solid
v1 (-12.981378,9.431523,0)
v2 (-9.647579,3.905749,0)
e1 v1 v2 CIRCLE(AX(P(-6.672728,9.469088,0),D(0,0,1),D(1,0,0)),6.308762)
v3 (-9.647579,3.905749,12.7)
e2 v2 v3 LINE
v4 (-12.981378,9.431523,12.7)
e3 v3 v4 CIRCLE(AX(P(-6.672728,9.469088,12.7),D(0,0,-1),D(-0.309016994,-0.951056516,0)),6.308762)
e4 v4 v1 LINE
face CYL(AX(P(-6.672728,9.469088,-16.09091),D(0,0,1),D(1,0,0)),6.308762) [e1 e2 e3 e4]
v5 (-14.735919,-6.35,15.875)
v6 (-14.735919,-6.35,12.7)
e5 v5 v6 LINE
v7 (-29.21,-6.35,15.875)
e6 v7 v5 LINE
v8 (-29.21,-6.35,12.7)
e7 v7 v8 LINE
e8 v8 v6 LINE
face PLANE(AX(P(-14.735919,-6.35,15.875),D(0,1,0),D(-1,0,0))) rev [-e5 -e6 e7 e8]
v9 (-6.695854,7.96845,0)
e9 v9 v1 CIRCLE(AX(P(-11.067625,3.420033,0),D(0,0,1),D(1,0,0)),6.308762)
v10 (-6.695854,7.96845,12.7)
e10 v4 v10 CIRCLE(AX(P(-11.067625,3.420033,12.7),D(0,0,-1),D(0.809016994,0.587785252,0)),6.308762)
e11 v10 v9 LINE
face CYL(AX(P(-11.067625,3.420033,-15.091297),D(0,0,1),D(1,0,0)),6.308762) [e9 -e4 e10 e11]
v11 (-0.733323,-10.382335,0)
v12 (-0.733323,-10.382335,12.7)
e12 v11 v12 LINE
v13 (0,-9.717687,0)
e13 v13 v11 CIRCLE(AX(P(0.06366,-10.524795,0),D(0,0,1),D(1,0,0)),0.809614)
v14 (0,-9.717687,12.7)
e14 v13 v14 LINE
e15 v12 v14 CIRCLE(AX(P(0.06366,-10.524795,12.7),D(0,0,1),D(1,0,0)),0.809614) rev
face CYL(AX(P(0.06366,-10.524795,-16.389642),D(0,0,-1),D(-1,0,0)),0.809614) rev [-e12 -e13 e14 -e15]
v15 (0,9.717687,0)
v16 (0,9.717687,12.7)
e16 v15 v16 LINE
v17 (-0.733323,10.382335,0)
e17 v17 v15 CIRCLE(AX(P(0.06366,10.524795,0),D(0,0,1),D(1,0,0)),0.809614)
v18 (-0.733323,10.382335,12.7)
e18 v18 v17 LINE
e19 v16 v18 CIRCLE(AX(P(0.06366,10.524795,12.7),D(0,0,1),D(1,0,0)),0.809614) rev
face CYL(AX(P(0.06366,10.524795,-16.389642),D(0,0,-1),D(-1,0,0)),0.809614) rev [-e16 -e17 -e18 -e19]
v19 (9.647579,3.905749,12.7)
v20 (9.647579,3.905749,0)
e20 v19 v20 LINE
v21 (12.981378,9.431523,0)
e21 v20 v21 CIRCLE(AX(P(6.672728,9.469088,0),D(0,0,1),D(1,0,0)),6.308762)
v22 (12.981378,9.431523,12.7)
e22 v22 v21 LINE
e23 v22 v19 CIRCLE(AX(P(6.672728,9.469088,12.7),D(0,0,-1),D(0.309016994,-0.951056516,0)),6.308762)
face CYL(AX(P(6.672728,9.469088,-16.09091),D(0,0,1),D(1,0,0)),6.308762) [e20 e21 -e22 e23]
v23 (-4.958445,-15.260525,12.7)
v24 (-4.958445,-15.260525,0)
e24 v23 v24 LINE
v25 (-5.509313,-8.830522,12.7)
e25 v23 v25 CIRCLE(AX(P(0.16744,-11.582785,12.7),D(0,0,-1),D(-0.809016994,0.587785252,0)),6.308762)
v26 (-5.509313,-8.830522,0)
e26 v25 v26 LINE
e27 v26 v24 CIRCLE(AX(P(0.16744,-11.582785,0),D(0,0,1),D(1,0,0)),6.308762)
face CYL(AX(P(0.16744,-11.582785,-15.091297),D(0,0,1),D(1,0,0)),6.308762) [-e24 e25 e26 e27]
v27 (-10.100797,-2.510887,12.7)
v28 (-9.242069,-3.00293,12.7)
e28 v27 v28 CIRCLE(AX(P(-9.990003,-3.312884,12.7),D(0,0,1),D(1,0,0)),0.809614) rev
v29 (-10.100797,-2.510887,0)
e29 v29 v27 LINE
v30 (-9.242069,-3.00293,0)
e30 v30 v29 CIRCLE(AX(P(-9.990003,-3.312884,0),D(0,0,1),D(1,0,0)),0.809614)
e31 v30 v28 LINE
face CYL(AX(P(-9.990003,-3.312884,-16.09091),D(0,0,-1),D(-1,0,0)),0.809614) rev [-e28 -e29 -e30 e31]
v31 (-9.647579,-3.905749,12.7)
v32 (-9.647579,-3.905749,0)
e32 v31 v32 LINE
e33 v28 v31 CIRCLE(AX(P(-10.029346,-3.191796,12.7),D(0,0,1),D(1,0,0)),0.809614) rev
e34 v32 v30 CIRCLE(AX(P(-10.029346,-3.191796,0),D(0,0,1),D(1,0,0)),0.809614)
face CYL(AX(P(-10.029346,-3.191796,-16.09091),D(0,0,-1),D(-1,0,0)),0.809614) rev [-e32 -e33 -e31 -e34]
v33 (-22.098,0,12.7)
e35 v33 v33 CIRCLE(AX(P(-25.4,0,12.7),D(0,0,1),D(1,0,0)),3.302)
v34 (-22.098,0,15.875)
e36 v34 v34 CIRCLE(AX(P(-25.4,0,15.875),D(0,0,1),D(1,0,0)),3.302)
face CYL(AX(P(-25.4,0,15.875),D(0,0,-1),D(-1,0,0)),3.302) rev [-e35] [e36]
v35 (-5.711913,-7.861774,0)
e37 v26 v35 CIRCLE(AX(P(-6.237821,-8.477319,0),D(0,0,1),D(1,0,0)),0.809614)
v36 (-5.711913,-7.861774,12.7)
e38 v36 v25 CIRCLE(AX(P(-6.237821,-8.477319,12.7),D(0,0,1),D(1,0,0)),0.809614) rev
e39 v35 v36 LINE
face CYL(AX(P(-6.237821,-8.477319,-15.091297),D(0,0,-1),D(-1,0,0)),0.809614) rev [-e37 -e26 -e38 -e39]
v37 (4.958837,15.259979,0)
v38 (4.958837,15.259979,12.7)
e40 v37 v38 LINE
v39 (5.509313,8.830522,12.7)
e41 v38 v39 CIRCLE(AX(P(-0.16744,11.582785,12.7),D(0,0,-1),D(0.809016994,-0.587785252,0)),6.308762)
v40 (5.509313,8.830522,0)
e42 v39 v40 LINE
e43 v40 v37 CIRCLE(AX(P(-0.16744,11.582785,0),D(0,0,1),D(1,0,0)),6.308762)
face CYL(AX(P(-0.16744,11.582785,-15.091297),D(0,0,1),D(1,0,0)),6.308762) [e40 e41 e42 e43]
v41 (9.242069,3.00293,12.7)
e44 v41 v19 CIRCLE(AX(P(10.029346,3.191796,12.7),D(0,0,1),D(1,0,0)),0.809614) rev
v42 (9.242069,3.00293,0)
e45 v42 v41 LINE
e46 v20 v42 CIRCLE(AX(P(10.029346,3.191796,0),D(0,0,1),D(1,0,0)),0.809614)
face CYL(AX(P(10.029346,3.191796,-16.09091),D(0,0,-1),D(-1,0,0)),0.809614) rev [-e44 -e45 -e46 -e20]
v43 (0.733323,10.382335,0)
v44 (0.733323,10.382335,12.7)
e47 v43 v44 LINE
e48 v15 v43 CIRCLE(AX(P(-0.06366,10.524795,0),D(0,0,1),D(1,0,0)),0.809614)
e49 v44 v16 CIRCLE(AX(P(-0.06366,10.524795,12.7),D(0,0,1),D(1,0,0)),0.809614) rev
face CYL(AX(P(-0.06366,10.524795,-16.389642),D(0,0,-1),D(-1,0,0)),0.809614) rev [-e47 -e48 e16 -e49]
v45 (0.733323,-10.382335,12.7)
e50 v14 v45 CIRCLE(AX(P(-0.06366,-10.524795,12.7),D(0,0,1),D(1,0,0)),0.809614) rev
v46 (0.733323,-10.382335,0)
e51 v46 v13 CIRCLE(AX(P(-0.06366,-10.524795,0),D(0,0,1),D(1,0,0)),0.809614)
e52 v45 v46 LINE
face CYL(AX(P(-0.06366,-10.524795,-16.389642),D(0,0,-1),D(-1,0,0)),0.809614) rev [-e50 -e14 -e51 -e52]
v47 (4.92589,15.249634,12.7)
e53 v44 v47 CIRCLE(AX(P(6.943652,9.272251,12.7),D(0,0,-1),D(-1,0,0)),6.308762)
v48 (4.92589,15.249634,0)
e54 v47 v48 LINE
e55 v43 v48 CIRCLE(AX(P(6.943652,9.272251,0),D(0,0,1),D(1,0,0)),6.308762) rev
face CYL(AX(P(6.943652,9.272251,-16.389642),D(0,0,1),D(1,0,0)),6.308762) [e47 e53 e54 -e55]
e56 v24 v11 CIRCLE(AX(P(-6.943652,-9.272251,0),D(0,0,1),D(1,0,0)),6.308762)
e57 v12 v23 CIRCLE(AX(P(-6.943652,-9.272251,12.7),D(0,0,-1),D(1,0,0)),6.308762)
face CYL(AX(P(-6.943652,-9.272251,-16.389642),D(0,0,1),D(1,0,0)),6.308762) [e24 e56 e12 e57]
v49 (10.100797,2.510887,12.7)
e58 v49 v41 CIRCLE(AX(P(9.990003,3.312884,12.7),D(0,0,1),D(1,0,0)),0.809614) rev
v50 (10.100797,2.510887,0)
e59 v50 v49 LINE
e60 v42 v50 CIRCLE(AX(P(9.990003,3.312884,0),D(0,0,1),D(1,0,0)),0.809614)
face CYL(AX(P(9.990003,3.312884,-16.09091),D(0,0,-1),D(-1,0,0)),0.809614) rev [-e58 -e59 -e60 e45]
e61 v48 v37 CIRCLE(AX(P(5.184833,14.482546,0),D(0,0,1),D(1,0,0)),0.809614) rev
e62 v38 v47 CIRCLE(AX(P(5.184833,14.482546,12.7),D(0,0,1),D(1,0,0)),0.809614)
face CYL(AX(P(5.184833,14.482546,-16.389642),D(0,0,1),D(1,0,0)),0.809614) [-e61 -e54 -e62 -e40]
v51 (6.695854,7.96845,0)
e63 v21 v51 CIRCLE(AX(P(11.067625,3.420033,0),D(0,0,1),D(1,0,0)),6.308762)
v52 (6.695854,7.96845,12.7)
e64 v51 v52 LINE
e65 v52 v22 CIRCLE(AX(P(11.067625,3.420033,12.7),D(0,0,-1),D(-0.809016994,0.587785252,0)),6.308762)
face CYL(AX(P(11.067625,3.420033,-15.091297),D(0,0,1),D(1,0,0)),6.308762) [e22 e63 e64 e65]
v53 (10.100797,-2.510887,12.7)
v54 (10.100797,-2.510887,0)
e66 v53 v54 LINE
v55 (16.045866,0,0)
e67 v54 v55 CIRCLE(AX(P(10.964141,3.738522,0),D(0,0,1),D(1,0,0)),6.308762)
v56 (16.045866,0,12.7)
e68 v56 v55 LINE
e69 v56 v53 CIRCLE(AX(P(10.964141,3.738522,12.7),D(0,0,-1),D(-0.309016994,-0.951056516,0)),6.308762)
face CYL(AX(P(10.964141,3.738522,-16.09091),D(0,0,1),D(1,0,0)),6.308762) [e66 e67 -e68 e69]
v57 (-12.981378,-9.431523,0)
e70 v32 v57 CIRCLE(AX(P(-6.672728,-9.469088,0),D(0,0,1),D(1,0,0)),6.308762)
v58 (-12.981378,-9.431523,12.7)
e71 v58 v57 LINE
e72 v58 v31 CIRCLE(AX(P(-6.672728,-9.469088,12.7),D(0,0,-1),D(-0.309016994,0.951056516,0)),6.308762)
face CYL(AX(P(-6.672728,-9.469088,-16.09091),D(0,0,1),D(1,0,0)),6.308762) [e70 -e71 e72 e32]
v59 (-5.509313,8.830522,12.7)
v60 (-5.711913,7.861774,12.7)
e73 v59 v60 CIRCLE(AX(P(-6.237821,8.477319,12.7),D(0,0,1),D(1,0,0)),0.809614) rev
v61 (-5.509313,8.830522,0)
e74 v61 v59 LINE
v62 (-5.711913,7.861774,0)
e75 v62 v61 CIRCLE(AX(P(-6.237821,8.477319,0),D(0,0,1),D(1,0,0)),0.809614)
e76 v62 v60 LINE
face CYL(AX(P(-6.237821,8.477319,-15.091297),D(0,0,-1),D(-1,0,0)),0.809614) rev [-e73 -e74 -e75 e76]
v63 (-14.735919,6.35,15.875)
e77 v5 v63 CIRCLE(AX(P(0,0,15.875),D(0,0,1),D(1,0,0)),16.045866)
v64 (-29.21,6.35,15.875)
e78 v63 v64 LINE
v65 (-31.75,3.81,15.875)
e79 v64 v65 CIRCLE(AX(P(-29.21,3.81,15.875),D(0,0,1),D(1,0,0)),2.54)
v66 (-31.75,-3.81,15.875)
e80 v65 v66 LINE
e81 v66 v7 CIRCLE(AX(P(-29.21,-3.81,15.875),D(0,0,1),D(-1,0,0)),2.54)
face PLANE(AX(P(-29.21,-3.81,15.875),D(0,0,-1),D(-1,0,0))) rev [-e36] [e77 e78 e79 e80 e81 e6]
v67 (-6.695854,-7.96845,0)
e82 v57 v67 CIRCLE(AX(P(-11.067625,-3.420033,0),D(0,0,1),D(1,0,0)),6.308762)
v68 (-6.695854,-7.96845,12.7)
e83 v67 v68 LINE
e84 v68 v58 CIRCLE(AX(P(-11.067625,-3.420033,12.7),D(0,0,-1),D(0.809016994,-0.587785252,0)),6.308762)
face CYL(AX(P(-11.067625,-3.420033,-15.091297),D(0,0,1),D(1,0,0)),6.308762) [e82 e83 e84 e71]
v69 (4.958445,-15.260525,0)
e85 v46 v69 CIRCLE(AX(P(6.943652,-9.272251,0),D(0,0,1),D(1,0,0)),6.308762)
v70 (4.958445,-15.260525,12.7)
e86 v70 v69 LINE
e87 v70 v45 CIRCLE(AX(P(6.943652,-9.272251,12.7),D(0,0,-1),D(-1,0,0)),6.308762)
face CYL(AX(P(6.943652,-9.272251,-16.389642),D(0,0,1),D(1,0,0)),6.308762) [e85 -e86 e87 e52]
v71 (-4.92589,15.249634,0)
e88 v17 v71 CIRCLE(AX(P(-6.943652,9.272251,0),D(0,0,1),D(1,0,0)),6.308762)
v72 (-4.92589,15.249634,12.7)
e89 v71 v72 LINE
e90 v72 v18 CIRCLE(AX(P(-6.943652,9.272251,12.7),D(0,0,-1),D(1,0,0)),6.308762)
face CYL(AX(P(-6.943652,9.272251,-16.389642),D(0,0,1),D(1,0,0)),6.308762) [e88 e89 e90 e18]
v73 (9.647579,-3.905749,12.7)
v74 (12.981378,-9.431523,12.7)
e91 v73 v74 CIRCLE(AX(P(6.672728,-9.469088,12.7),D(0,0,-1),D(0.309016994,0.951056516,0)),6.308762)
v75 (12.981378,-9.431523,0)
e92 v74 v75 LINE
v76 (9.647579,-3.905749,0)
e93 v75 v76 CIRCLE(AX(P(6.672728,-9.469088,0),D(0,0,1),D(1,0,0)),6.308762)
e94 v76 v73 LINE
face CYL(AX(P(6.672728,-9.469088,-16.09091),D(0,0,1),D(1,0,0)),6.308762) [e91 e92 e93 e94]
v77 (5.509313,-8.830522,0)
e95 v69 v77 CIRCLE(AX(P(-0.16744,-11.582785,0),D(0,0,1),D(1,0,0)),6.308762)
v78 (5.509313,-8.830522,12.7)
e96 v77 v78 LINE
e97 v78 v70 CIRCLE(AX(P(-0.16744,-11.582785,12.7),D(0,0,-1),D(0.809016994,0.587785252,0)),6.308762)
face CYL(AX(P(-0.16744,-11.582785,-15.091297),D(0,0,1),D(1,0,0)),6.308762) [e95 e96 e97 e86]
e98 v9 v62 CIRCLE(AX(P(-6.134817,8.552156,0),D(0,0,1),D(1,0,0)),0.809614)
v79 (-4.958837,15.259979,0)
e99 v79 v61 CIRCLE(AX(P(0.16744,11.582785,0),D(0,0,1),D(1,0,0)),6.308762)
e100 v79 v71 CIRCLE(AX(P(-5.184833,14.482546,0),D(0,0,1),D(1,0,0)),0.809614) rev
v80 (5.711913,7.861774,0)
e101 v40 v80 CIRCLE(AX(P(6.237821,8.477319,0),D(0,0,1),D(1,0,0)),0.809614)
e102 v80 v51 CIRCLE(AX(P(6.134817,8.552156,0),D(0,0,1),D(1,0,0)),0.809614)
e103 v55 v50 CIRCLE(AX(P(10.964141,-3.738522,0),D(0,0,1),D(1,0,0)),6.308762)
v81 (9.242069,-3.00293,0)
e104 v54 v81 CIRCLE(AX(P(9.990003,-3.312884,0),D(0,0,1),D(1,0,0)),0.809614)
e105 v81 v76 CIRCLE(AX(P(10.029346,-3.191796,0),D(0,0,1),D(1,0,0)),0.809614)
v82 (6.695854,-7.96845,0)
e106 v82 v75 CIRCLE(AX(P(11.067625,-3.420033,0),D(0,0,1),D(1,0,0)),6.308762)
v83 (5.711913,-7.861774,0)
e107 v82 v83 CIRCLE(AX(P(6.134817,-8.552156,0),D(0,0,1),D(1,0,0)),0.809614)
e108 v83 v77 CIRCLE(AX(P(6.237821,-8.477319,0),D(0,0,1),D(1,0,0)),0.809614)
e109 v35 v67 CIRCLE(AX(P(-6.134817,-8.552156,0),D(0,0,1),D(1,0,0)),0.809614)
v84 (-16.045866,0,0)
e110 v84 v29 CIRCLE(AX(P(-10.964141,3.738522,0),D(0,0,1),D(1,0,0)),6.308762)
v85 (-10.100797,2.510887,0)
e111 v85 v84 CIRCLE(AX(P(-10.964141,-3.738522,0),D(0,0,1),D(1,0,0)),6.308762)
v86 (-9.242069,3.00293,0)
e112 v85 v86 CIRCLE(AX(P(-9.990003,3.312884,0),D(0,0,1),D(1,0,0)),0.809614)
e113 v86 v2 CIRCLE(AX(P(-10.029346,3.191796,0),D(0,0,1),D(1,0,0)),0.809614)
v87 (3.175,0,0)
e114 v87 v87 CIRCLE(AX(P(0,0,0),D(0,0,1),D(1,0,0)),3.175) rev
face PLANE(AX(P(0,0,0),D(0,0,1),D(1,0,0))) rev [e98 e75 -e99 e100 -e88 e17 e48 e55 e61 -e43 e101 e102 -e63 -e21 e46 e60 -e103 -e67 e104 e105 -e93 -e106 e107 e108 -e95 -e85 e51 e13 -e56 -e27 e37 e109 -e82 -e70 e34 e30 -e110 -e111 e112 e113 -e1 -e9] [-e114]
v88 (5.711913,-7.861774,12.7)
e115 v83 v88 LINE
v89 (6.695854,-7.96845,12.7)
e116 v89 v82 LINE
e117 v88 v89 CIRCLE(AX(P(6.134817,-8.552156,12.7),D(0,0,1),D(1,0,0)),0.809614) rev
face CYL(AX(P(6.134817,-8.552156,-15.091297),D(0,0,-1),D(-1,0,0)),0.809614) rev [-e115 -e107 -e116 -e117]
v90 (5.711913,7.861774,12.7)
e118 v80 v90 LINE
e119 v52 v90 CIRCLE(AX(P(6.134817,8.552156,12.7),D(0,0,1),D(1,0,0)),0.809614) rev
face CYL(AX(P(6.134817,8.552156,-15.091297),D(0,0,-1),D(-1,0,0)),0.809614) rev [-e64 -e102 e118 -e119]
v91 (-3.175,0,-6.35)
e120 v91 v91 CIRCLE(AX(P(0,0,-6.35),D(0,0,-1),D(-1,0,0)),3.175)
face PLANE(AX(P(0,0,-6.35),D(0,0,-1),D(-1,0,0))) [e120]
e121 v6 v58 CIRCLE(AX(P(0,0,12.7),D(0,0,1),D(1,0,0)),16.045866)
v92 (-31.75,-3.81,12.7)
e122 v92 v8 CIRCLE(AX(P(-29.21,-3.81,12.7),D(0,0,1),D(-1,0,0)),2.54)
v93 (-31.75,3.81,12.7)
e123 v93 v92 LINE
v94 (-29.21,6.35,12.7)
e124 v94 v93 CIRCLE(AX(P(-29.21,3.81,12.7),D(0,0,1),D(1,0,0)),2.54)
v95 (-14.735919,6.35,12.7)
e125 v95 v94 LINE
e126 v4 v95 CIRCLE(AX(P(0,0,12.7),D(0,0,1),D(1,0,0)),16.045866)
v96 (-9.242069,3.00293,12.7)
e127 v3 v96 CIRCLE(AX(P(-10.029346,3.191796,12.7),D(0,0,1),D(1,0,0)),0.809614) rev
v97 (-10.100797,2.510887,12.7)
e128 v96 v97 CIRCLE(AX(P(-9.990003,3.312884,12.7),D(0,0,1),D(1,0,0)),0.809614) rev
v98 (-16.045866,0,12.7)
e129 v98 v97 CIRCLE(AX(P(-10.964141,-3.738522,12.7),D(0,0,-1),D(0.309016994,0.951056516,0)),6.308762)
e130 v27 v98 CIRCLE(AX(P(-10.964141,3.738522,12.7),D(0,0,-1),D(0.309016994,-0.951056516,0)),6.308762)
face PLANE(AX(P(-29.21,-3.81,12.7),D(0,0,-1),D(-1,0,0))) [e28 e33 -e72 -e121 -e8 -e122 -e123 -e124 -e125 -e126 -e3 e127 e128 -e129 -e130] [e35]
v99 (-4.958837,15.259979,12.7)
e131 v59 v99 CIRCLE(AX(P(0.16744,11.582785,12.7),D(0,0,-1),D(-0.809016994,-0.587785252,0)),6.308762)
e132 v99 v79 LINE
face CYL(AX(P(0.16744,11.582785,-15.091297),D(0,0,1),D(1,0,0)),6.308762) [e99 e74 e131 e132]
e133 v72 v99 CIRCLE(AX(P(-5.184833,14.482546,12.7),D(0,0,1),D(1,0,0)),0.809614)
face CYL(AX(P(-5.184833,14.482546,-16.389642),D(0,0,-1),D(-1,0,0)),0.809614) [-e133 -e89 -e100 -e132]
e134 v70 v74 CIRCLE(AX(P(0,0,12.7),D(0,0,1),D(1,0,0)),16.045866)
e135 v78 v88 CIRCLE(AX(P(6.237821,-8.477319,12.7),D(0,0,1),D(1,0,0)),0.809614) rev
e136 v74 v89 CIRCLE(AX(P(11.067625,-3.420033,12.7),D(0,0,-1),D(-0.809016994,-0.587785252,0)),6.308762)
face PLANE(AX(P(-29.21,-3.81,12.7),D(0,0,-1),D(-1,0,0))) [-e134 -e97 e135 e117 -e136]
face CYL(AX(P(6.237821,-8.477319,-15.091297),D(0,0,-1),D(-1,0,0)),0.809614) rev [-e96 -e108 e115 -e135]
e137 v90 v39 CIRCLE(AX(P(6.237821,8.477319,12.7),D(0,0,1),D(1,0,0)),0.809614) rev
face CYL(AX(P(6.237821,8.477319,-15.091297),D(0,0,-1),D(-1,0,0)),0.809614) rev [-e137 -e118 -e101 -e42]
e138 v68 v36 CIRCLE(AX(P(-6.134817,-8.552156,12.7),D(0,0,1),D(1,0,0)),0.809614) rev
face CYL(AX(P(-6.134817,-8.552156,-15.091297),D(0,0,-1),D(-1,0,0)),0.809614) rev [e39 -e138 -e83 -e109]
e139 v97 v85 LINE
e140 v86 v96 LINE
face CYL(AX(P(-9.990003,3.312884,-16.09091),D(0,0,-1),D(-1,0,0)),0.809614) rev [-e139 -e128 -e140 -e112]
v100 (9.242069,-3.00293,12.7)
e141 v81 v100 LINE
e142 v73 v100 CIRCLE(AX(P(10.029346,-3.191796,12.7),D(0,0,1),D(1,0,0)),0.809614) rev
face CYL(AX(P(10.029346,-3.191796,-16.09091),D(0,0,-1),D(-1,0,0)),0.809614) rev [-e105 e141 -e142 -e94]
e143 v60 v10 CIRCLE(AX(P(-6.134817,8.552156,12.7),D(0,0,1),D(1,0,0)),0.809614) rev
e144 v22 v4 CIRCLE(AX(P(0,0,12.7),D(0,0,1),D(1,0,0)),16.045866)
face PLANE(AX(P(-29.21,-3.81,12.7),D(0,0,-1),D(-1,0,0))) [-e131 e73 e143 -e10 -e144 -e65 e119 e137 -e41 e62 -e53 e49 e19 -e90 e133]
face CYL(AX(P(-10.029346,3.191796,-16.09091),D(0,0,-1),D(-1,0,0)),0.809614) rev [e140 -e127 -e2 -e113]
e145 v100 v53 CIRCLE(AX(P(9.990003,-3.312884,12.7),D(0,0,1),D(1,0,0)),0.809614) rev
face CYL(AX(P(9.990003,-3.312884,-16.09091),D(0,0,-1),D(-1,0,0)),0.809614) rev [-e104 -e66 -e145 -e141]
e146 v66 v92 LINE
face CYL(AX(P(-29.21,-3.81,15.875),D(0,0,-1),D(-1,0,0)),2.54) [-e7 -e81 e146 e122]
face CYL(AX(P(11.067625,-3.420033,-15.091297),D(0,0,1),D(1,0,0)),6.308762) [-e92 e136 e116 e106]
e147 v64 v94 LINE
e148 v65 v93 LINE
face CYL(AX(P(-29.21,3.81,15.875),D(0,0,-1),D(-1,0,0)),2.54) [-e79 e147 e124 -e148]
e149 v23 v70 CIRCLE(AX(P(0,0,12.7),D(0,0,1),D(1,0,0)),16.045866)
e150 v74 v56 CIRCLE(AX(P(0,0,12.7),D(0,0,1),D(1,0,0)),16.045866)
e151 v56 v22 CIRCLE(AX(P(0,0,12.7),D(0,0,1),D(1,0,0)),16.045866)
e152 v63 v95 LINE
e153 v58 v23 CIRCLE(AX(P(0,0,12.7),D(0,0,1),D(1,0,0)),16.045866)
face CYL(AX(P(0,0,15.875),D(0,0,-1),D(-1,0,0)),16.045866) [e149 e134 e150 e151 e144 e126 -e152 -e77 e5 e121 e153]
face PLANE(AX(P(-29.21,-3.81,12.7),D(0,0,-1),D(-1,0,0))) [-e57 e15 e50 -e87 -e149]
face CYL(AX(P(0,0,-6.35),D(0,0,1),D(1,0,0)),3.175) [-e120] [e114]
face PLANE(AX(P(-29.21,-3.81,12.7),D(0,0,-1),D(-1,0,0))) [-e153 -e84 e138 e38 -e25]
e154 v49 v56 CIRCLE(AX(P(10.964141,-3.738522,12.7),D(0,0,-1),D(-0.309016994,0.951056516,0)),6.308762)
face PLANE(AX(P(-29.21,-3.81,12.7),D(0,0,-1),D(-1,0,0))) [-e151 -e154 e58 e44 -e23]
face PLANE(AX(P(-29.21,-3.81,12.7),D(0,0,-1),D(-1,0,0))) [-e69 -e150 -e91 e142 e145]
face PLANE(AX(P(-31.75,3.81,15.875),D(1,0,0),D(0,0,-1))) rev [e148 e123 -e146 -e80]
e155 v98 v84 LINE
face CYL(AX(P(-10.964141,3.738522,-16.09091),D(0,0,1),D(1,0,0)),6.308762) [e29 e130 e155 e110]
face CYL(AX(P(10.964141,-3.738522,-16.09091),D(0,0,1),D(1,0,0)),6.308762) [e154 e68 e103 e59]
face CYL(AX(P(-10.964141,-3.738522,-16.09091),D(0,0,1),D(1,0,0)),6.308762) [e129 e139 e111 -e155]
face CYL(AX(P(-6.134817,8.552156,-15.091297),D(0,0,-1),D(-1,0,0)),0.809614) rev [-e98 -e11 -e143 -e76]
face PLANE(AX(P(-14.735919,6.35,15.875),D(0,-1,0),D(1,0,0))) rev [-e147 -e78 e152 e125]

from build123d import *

# Parameters (mm, degrees)
SKETCH1_R           = 16.192287761
BOSS_EXTRUDE1_DEPTH = 12.7
CUT_EXTRUDE1_DEPTH  = 12.7
FILLET1_R           = 0.809614388
CIRPATTERN1_DEPTH   = 12.7
SKETCH3_R           = 3.175
BOSS_EXTRUDE2_DEPTH = 6.35
SKETCH5_R           = 3.302
BOSS_EXTRUDE3_DEPTH = 3.175


# Read off the part's stored shape, not the designer's step: CirPattern1
with BuildPart() as part:
    # Sketch1 → Boss-Extrude1 (new body)
    with BuildSketch(Plane.XY):
        Circle(SKETCH1_R)
    extrude(amount=BOSS_EXTRUDE1_DEPTH)

    # Sketch2 → Cut-Extrude1 (cut)
    with BuildSketch(Plane.XY.offset(12.7)):
        with BuildLine():
            ThreePointArc((-0.648981162, 9.693672643), (-2.761211409, 13.995350311), (-7.286822608, 15.571672188))
            ThreePointArc((-7.286822608, 15.571672188), (0, 17.192287761), (7.286822608, 15.571672188))
            ThreePointArc((7.286822608, 15.571672188), (2.761211409, 13.995350311), (0.648981162, 9.693672643))
            ThreePointArc((0.648981162, 9.693672643), (0, 9.715372656), (-0.648981162, 9.693672643))
        make_face()
    extrude(amount=-CUT_EXTRUDE1_DEPTH, mode=Mode.SUBTRACT)

    # Fillet1
    # the kernel refuses this fillet: 0.809614388 mm, written as the material it adds along each edge
    with BuildSketch(Plane(origin=(0.648981162, 9.693672643, 12.7), x_dir=(0.12156320456415769, 0.9925836928421162, 0), z_dir=(0, 0, -1))) as fillet1_piece_1:
        with BuildLine():
            CenterArc((0.738327126, -0.808389468), FILLET1_R, 93.152151787, 79.518968538)
            ThreePointArc((-0.064672931, -0.705111371), (-0.025910634, -0.353145064), (0, 0))
            ThreePointArc((0, 0), (0.346904155, -0.009544948), (0.69380831, 0))
        make_face()
    extrude(amount=12.7)
    with BuildSketch(Plane(origin=(-0.648981162, 9.693672643, 12.7), x_dir=(0.9995379445948291, 0.030395679218338256, 0), z_dir=(0, 0, -1))) as fillet1_piece_2:
        with BuildLine():
            CenterArc((0.737574027, -0.809076654), FILLET1_R, 92.088363944, 79.518968538)
            ThreePointArc((-0.063370217, -0.690908233), (-0.022180058, -0.346325921), (0, 0))
            ThreePointArc((0, 0), (0.354035533, -0.006452804), (0.708071066, 0))
        make_face()
    extrude(amount=12.7)
    # the kernel refuses this fillet: 0.809614388 mm, written as the material it takes off along each edge
    with BuildSketch(Plane(origin=(-5.198948894, 15.334963753, 13.415202102), x_dir=(-0.9443027648777296, -0.32907793642885796, 0), z_dir=(0, 0, -1))) as fillet1_2_piece_1:
        with BuildLine():
            CenterArc((0.267182003, -0.809585402), FILLET1_R, 89.515166978, 38.350588161)
            ThreePointArc((-0.229770211, -0.170434439), (-0.115851307, -0.08391464), (0, 0))
            ThreePointArc((0, 0), (0.137016412, 0.000579715), (0.274032824, 0))
        make_face()
    extrude(amount=14.130404205, mode=Mode.SUBTRACT)
    with BuildSketch(Plane(origin=(5.198948894, 15.334963753, 13.415202102), x_dir=(0.9443027648777299, -0.32907793642885697, 0), z_dir=(0, 0, -1))) as fillet1_2_piece_2:
        with BuildLine():
            CenterArc((0.267182003, 0.809585402), FILLET1_R, 232.134244861, 38.350588161)
            ThreePointArc((-0.229770211, 0.170434439), (-0.115851307, 0.08391464), (0, 0))
            ThreePointArc((0, 0), (0.137016412, -0.000579715), (0.274032824, 0))
        make_face()
    extrude(amount=14.130404205, mode=Mode.SUBTRACT)

    # CirPattern1 outline → CirPattern1 (cut)
    with BuildSketch(Plane.XY):
        with BuildLine():
            ThreePointArc((4.958837242, 15.259978898), (6.118325298, 12.120958043), (5.50931312, 8.830522108))
            ThreePointArc((5.50931312, 8.830522108), (5.445351284, 8.311585796), (5.711912975, 7.86177375))
            ThreePointArc((5.711912975, 7.86177375), (6.222081746, 7.747258083), (6.695854212, 7.968449544))
            ThreePointArc((6.695854212, 7.968449544), (9.637377118, 9.564531404), (12.981378188, 9.431523325))
            ThreePointArc((12.981378188, 9.431523325), (12.074523228, 6.21008756), (9.647578607, 3.905749452))
            ThreePointArc((9.647578607, 3.905749452), (9.290809283, 3.523516981), (9.242069335, 3.002930361))
            ThreePointArc((9.242069335, 3.002930361), (9.58749392, 2.610415561), (10.100796975, 2.510886743))
            ThreePointArc((10.100796975, 2.510886743), (13.418692374, 2.073160309), (16.045865882, 0))
            ThreePointArc((16.045865882, 0), (13.418692374, -2.073160309), (10.100796975, -2.510886743))
            ThreePointArc((10.100796975, -2.510886743), (9.58749392, -2.610415561), (9.242069335, -3.002930361))
            ThreePointArc((9.242069335, -3.002930361), (9.290809283, -3.523516981), (9.647578607, -3.905749452))
            ThreePointArc((9.647578607, -3.905749452), (12.074523228, -6.21008756), (12.981378188, -9.431523325))
            ThreePointArc((12.981378188, -9.431523325), (9.637377118, -9.564531404), (6.695854212, -7.968449544))
            ThreePointArc((6.695854212, -7.968449544), (6.222081746, -7.747258083), (5.711912975, -7.86177375))
            ThreePointArc((5.711912975, -7.86177375), (5.445351284, -8.311585796), (5.50931312, -8.830522108))
            ThreePointArc((5.50931312, -8.830522108), (6.118296607, -12.121293054), (4.958445247, -15.260525306))
            ThreePointArc((4.958445247, -15.260525306), (2.174911365, -13.402576589), (0.733322724, -10.382335457))
            ThreePointArc((0.733322724, -10.382335457), (0.480045825, -9.924911338), (0, -9.717686779))
            ThreePointArc((0, -9.717686779), (-0.480045825, -9.924911338), (-0.733322724, -10.382335457))
            ThreePointArc((-0.733322724, -10.382335457), (-2.174911365, -13.402576589), (-4.958445247, -15.260525306))
            ThreePointArc((-4.958445247, -15.260525306), (-6.118296607, -12.121293054), (-5.50931312, -8.830522108))
            ThreePointArc((-5.50931312, -8.830522108), (-5.445351284, -8.311585796), (-5.711912975, -7.86177375))
            ThreePointArc((-5.711912975, -7.86177375), (-6.222081746, -7.747258083), (-6.695854212, -7.968449544))
            ThreePointArc((-6.695854212, -7.968449544), (-9.637377118, -9.564531404), (-12.981378188, -9.431523325))
            ThreePointArc((-12.981378188, -9.431523325), (-12.074523228, -6.21008756), (-9.647578607, -3.905749452))
            ThreePointArc((-9.647578607, -3.905749452), (-9.290809283, -3.523516981), (-9.242069335, -3.002930361))
            ThreePointArc((-9.242069335, -3.002930361), (-9.58749392, -2.610415561), (-10.100796975, -2.510886743))
            ThreePointArc((-10.100796975, -2.510886743), (-13.418692374, -2.073160309), (-16.045865882, 0))
            ThreePointArc((-16.045865882, 0), (-13.418692374, 2.073160309), (-10.100796975, 2.510886743))
            ThreePointArc((-10.100796975, 2.510886743), (-9.58749392, 2.610415561), (-9.242069335, 3.002930361))
            ThreePointArc((-9.242069335, 3.002930361), (-9.290809283, 3.523516981), (-9.647578607, 3.905749452))
            ThreePointArc((-9.647578607, 3.905749452), (-12.074523228, 6.21008756), (-12.981378188, 9.431523325))
            ThreePointArc((-12.981378188, 9.431523325), (-9.637377118, 9.564531404), (-6.695854212, 7.968449544))
            ThreePointArc((-6.695854212, 7.968449544), (-6.222081746, 7.747258083), (-5.711912975, 7.86177375))
            ThreePointArc((-5.711912975, 7.86177375), (-5.445351284, 8.311585796), (-5.50931312, 8.830522108))
            ThreePointArc((-5.50931312, 8.830522108), (-6.118325298, 12.120958043), (-4.958837242, 15.259978898))
            ThreePointArc((-4.958837242, 15.259978898), (-5.20947806, 15.291785512), (-5.457718847, 15.244785597))
            ThreePointArc((-5.457718847, 15.244785597), (0, -16.192287761), (5.457718847, 15.244785597))
            ThreePointArc((5.457718847, 15.244785597), (5.20947806, 15.291785512), (4.958837242, 15.259978898))
        make_face()
    extrude(amount=CIRPATTERN1_DEPTH, mode=Mode.SUBTRACT)

    # Sketch3 → Boss-Extrude2 (add)
    with BuildSketch(Plane(origin=(0, 0, 0), x_dir=(-1, 0, 0), z_dir=(0, 0, -1))):
        with Locations(Location((0, 0, 0), (0, 0, 180))):
            Circle(SKETCH3_R)
    extrude(amount=BOSS_EXTRUDE2_DEPTH)

    # Sketch5 → Boss-Extrude3 (add)
    with BuildSketch(Plane.XY.offset(12.7)):
        with BuildLine():
            Line((-14.735919106, 6.35), (-29.21, 6.35))
            ThreePointArc((-29.21, 6.35), (-31.006051224, 5.606051224), (-31.75, 3.81))
            Line((-31.75, 3.81), (-31.75, -3.81))
            ThreePointArc((-31.75, -3.81), (-31.006051224, -5.606051224), (-29.21, -6.35))
            Line((-29.21, -6.35), (-14.735919106, -6.35))
            ThreePointArc((-14.735919106, -6.35), (16.045865882, 0), (-14.735919106, 6.35))
        make_face()
        with Locations((-25.4, 0)):
            Circle(SKETCH5_R, mode=Mode.SUBTRACT)
    extrude(amount=BOSS_EXTRUDE3_DEPTH)


solid = part.part
